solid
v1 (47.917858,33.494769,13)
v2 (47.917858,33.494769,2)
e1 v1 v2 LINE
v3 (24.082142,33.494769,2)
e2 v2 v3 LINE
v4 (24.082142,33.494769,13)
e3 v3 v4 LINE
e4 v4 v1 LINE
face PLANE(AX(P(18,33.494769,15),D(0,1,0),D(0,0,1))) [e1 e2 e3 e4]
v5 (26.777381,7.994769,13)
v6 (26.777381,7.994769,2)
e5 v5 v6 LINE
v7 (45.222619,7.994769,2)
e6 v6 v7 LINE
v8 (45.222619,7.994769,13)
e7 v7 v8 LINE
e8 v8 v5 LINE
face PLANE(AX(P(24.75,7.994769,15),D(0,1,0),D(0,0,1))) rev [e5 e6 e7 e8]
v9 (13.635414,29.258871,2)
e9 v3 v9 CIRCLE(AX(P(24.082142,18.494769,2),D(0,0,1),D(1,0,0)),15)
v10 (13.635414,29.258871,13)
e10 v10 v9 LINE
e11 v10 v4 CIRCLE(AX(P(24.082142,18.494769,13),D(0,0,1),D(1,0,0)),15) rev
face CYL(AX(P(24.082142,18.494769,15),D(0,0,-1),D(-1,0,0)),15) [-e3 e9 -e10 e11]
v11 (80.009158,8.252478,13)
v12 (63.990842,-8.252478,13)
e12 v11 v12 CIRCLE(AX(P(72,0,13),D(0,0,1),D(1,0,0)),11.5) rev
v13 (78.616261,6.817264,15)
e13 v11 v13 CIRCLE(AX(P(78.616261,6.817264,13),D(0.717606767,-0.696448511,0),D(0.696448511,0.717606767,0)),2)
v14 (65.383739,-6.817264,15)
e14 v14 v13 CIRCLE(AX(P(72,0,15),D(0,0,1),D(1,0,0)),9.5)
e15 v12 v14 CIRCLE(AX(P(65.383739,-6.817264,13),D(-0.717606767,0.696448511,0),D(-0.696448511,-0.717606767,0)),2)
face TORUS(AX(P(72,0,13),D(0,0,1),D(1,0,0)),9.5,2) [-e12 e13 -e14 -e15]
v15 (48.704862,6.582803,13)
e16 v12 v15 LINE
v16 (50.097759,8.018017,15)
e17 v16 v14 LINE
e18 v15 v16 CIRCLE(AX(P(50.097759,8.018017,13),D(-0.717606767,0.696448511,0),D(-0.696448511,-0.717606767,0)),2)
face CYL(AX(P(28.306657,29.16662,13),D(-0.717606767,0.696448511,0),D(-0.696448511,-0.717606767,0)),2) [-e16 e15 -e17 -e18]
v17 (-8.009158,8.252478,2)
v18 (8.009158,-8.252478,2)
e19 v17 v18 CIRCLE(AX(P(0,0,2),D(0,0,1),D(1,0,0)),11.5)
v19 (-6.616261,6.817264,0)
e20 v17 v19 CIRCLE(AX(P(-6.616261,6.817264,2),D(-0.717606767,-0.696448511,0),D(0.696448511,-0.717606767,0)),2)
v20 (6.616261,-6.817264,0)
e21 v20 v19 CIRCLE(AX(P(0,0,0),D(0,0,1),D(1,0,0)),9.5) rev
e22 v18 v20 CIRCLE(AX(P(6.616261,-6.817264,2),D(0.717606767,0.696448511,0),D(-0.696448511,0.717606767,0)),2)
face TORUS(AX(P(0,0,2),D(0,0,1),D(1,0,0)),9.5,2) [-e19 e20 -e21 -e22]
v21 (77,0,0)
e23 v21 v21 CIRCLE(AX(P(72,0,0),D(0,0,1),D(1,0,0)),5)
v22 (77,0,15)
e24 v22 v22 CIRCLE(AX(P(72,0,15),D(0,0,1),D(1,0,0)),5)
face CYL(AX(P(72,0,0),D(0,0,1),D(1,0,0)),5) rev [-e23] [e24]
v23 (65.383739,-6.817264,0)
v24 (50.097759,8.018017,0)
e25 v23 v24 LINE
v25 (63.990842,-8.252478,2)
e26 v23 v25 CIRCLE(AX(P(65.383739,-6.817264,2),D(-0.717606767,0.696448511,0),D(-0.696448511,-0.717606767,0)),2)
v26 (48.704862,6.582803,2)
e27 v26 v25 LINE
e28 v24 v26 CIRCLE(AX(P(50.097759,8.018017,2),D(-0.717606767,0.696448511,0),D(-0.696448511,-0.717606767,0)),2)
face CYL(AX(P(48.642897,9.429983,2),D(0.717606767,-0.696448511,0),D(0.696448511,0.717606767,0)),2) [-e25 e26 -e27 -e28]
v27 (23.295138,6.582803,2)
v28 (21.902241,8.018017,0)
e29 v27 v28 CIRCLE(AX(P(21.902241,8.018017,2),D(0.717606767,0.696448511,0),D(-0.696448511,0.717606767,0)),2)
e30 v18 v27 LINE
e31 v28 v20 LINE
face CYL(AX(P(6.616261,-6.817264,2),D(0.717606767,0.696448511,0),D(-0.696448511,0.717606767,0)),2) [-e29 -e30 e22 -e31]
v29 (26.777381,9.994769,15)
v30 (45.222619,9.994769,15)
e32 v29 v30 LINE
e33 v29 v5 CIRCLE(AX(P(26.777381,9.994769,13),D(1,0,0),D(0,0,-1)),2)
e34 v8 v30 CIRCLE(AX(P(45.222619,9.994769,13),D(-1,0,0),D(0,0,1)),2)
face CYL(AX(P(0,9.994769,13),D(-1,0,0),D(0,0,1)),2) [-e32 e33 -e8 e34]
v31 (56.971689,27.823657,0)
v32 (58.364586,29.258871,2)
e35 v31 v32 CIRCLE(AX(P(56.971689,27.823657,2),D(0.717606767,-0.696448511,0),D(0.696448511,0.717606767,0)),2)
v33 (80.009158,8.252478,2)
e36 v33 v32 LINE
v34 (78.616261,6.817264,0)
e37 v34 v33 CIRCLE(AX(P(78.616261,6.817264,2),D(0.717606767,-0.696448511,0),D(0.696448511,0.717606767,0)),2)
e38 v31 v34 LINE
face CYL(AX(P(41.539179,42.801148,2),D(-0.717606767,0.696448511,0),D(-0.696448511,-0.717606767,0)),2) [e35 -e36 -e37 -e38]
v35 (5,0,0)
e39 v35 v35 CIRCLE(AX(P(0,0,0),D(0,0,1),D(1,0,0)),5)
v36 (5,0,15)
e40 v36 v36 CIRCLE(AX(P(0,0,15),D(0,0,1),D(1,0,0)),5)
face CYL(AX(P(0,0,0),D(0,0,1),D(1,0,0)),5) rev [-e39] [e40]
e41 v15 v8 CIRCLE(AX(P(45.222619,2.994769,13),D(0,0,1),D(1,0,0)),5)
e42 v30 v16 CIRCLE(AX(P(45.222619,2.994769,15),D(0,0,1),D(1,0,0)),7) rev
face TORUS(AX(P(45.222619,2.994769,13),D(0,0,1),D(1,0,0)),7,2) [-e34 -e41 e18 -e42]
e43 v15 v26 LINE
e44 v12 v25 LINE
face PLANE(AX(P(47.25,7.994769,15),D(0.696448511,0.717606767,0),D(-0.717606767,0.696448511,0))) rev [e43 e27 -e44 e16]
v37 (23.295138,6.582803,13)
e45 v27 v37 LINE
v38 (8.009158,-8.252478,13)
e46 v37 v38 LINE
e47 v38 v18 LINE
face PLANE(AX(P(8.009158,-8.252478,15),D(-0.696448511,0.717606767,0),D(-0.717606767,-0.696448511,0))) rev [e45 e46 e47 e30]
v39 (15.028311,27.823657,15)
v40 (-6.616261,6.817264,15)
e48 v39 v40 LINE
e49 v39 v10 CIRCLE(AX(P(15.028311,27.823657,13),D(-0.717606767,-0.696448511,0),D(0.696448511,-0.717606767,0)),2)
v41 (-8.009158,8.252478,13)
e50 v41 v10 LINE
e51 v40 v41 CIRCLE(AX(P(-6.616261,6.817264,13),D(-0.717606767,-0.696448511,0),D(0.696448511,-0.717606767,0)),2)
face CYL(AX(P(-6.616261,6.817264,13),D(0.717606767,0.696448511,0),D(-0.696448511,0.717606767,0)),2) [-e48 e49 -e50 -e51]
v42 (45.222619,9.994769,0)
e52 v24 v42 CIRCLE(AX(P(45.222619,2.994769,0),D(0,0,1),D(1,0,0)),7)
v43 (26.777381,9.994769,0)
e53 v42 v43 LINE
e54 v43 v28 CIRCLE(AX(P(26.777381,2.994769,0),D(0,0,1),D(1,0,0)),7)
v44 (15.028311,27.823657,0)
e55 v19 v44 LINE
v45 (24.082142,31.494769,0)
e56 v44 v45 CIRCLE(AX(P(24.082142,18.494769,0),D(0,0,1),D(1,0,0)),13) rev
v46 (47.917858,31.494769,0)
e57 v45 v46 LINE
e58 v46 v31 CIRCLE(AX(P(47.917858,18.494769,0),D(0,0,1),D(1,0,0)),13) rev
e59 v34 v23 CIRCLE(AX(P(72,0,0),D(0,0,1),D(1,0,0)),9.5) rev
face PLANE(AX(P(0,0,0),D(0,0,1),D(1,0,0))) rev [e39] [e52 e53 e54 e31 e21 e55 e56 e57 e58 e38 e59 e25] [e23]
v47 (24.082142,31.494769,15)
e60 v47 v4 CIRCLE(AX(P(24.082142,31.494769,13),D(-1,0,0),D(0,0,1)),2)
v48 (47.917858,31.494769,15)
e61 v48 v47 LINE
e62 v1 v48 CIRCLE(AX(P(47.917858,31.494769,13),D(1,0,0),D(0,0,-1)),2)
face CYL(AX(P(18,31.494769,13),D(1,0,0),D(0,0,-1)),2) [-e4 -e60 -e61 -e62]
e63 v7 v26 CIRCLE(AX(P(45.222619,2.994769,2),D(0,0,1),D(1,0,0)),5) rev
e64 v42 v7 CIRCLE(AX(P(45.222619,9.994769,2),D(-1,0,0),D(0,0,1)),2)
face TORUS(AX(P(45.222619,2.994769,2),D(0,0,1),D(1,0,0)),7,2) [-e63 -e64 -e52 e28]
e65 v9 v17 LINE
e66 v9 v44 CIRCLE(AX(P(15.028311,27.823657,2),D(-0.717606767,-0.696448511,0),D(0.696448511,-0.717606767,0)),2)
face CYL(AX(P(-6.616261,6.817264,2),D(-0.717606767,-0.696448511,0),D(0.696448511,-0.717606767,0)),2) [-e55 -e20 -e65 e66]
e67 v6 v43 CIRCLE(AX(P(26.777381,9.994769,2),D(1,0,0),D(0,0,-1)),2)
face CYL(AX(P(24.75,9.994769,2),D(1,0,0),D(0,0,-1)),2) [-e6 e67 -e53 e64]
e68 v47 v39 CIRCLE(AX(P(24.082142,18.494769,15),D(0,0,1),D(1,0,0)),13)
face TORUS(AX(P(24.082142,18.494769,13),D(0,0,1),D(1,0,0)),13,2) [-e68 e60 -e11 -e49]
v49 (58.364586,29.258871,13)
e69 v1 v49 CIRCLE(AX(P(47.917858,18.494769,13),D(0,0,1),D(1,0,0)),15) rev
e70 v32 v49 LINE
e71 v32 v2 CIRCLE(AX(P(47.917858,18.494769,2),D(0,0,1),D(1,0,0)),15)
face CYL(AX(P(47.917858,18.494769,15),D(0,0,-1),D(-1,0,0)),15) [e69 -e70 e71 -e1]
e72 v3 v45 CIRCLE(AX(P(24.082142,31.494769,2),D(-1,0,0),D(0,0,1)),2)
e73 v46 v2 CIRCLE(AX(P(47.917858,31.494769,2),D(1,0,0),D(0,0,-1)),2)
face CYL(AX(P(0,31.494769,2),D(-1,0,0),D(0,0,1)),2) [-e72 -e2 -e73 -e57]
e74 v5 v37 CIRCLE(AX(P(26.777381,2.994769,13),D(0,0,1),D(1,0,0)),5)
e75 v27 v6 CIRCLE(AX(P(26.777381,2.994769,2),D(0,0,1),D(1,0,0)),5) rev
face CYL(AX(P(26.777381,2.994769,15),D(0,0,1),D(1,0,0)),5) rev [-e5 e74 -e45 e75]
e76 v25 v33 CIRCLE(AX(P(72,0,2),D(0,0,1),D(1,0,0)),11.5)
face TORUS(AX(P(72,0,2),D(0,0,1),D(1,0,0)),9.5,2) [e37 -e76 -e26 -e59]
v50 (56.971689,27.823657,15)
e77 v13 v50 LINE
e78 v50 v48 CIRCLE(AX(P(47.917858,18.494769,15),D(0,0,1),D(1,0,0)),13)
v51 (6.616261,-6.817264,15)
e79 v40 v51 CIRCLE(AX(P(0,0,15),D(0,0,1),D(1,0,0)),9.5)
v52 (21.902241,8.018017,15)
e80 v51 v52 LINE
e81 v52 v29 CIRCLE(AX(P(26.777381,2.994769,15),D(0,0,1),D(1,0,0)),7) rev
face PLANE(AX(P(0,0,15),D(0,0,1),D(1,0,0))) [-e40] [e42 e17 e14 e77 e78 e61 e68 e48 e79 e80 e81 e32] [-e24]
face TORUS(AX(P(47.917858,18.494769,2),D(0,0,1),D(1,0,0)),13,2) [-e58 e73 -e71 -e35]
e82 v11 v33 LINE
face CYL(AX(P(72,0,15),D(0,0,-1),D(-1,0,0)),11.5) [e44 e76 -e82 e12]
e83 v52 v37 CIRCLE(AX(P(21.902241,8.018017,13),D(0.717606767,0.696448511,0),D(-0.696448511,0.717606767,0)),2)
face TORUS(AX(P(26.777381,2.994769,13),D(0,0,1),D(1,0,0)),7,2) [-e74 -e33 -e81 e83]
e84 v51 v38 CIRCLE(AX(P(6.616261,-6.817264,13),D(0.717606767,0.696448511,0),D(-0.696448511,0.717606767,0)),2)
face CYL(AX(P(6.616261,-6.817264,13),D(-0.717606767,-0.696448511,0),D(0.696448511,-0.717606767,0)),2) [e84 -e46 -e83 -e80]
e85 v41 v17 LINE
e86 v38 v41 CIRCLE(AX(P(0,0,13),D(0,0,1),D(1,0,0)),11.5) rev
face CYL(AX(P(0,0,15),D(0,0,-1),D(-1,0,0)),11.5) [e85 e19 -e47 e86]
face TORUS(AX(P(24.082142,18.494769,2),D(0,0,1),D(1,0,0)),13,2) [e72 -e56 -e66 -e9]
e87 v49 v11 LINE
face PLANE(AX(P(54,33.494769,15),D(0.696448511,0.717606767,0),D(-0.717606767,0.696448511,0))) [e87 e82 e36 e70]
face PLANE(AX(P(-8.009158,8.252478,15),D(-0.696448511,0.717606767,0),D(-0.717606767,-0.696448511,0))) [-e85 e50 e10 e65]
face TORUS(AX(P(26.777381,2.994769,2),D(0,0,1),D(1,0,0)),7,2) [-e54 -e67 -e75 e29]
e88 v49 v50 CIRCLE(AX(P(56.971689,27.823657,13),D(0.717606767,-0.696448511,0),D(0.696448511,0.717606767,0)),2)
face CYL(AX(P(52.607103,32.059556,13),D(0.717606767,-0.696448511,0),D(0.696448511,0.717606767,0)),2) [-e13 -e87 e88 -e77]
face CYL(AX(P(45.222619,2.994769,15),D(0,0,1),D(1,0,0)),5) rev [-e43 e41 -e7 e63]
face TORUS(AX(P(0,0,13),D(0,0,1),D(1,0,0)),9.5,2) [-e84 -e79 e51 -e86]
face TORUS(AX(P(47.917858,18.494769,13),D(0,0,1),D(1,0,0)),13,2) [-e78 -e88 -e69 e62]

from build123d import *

# Parameters (mm, degrees)
BASE_EXTRUDE_DEPTH = 15
HOLE1_OUTLINE_R    = 5
HOLE1_DEPTH        = 15
HOLE2_OUTLINE_R    = 5
HOLE2_DEPTH        = 15
FILLET1_R          = 15
FILLET2_R          = 5
FILLET3_R          = 2


# Read off the part's stored shape, not the designer's step: Hole1, Hole2
with BuildPart() as part:
    # Sketch1 → Base-Extrude (new body)
    with BuildSketch(Plane.XY):
        with BuildLine():
            Line((-8.009157876, 8.252477817), (18, 33.494769435))
            Line((18, 33.494769435), (54, 33.494769435))
            Line((54, 33.494769435), (80.009157876, 8.252477817))
            ThreePointArc((80.009157876, 8.252477817), (80.252477817, -8.009157876), (63.990842124, -8.252477817))
            Line((63.990842124, -8.252477817), (47.25, 7.994769435))
            Line((47.25, 7.994769435), (24.75, 7.994769435))
            Line((24.75, 7.994769435), (8.009157876, -8.252477817))
            ThreePointArc((8.009157876, -8.252477817), (-8.252477817, -8.009157876), (-8.009157876, 8.252477817))
        make_face()
    extrude(amount=BASE_EXTRUDE_DEPTH)

    # Hole1 outline → Hole1 (cut)
    with BuildSketch(Plane.XY):
        Circle(HOLE1_OUTLINE_R)
    extrude(amount=HOLE1_DEPTH, mode=Mode.SUBTRACT)

    # Hole2 outline → Hole2 (cut)
    with BuildSketch(Plane.XY):
        with Locations((72, 0)):
            Circle(HOLE2_OUTLINE_R)
    extrude(amount=HOLE2_DEPTH, mode=Mode.SUBTRACT)

    # Fillet1
    fillet1_edges = [part.edges().sort_by_distance(p)[0] for p in [
        (18, 33.494769435, 7.5),
        (54, 33.494769435, 7.5),
    ]]
    fillet(fillet1_edges, radius=FILLET1_R)

    # Fillet2
    fillet2_edges = [part.edges().sort_by_distance(p)[0] for p in [
        (47.25, 7.994769435, 7.5),
        (24.75, 7.994769435, 7.5),
    ]]
    fillet(fillet2_edges, radius=FILLET2_R)

    # Fillet3
    fillet3_edges = [part.edges().sort_by_distance(p)[0] for p in [
        (15.652147936, -0.834837274, 0),
        (-8.252477817, -8.009157876, 0),
        (80.252477817, -8.009157876, 15),
        (2.813128058, 18.755674377, 15),
        (36, 33.494769435, 0),
        (36, 33.494769435, 15),
        (69.186871942, 18.755674377, 0),
        (18.445720917, 32.395516223, 0),
        (53.554279083, 32.395516223, 0),
        (69.186871942, 18.755674377, 15),
        (18.445720917, 32.395516223, 15),
        (53.554279083, 32.395516223, 15),
        (-8.252477817, -8.009157876, 15),
        (36, 7.994769435, 0),
        (36, 7.994769435, 15),
        (56.347852064, -0.834837274, 0),
        (56.347852064, -0.834837274, 15),
        (24.898573639, 7.628351698, 0),
        (24.898573639, 7.628351698, 15),
        (47.101426361, 7.628351698, 0),
        (47.101426361, 7.628351698, 15),
        (15.652147936, -0.834837274, 15),
        (2.813128058, 18.755674377, 0),
        (80.252477817, -8.009157876, 0),
    ]]
    fillet(fillet3_edges, radius=FILLET3_R)


solid = part.part
